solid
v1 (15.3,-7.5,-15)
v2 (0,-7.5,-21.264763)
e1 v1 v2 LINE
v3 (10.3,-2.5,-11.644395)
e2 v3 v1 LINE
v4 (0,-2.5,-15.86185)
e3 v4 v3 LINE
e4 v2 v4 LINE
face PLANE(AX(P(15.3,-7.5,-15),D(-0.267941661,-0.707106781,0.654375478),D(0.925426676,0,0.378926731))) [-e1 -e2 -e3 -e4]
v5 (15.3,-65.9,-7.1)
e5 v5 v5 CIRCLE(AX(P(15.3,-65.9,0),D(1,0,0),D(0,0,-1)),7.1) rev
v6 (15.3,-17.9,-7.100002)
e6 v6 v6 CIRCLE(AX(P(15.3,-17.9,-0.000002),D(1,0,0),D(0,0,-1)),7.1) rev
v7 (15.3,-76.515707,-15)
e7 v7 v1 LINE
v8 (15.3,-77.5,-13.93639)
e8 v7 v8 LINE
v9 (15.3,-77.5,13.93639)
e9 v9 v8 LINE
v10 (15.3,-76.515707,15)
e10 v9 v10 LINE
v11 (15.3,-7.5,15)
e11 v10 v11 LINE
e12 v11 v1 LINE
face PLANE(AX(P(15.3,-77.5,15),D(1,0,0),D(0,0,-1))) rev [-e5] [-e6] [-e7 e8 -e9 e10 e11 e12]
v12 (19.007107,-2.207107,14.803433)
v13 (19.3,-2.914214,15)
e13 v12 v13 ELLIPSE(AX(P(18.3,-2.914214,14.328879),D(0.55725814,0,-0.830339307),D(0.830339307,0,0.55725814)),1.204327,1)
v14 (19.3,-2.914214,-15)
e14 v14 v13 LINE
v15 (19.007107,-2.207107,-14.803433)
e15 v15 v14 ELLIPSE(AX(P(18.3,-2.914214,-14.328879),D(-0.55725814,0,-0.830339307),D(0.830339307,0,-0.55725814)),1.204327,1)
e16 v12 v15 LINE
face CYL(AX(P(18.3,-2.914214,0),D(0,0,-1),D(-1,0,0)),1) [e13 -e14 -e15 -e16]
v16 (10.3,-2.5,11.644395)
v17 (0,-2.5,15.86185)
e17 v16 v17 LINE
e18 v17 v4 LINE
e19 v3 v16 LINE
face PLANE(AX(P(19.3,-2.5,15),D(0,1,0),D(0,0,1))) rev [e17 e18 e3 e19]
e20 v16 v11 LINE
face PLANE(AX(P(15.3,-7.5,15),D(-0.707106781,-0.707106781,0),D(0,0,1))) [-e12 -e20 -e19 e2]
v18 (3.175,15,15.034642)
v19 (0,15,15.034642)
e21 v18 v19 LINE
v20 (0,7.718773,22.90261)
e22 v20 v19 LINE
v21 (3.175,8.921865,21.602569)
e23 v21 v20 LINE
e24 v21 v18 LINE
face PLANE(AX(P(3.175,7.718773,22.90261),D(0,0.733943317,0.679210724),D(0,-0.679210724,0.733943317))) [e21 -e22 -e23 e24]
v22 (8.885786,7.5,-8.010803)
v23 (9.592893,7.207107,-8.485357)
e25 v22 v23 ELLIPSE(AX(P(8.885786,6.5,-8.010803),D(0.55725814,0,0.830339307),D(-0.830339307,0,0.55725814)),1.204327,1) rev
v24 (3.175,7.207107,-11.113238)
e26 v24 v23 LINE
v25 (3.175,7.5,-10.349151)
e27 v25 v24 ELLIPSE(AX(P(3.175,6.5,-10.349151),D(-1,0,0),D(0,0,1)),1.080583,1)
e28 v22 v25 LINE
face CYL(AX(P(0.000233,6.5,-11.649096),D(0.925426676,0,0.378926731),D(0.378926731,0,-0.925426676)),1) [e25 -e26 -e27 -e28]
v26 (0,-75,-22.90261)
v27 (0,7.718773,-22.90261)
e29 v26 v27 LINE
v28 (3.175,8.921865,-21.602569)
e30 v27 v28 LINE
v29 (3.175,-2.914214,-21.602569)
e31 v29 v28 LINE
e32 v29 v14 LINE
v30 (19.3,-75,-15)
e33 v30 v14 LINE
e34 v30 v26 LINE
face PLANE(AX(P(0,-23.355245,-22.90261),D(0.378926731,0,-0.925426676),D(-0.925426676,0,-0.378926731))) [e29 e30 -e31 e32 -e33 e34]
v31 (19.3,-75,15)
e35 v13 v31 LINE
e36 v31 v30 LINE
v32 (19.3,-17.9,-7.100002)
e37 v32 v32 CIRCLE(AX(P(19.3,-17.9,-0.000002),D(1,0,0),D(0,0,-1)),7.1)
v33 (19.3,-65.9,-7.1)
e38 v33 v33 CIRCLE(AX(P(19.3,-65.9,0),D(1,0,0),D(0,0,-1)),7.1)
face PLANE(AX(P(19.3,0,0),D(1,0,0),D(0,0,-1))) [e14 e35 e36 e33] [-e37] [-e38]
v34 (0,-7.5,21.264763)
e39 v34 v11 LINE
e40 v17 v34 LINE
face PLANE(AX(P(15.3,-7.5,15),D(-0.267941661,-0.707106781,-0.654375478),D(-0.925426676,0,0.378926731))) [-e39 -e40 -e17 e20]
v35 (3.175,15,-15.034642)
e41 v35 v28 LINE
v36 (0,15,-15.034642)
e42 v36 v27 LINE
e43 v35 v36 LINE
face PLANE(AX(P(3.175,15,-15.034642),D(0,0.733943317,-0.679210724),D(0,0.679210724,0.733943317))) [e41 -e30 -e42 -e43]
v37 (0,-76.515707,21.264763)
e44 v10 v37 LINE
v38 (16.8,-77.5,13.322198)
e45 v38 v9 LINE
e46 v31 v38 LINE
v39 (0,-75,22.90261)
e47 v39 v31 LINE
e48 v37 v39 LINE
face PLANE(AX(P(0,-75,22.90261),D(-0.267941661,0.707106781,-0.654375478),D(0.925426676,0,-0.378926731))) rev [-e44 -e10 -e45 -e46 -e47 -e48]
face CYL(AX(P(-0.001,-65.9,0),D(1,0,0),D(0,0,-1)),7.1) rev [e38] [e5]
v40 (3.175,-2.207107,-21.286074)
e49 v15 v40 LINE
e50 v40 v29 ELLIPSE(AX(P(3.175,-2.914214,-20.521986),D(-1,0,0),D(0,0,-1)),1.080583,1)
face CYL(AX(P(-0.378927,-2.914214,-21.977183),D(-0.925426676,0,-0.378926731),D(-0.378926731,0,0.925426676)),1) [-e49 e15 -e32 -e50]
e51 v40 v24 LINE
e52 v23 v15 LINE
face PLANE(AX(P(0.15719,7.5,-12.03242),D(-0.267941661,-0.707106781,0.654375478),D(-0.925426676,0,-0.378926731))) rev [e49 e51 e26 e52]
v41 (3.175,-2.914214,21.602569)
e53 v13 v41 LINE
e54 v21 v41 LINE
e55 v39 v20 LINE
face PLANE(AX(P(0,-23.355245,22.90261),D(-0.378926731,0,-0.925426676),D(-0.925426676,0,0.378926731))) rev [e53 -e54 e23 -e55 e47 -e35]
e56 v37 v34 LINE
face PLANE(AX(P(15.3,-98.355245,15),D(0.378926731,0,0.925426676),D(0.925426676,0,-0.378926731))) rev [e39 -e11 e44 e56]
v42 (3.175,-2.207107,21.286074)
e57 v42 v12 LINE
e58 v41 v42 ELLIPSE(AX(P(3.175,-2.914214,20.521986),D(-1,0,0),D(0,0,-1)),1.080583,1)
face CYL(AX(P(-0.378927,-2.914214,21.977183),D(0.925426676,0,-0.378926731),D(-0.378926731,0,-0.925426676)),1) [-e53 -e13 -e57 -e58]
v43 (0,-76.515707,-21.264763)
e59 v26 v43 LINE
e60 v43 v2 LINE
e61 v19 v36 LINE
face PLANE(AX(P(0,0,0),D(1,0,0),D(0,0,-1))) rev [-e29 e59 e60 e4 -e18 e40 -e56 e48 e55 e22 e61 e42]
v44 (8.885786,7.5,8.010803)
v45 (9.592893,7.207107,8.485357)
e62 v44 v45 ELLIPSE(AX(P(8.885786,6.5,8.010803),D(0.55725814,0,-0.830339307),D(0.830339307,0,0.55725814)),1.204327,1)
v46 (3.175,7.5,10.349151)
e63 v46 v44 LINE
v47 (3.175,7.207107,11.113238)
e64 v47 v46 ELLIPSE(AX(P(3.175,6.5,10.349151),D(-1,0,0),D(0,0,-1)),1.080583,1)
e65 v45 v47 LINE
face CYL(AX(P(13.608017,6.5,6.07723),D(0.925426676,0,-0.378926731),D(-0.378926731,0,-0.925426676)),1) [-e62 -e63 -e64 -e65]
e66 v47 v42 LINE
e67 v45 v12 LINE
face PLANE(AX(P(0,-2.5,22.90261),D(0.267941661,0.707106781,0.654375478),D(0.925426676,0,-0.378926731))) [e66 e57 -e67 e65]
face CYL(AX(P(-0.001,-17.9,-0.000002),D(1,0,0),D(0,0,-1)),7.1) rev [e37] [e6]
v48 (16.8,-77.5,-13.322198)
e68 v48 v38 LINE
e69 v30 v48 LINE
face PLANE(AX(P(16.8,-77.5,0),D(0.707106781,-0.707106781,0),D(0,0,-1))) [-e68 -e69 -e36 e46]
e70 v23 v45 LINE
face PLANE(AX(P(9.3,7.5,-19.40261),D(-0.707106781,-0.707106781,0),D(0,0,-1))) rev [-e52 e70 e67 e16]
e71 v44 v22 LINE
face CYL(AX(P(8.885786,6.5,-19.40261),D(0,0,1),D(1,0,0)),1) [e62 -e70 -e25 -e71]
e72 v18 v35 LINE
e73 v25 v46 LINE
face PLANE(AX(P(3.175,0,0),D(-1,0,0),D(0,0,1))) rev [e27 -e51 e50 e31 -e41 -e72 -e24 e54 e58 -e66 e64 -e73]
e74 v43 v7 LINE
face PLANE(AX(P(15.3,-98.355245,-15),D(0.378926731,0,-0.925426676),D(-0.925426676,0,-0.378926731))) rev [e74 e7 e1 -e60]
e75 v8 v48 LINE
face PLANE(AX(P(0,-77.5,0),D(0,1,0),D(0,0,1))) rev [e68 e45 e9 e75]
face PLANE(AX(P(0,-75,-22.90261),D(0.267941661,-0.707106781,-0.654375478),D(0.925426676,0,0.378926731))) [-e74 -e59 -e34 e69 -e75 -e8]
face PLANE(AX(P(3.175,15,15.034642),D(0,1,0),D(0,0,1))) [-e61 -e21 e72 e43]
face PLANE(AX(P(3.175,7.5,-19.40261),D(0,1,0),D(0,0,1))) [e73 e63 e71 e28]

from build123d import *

# Parameters (mm, degrees)
SKETCH1_W            = 30
SKETCH1_H            = 5
BOSS_EXTRUDE1_DEPTH  = 19.3
SKETCH2_W            = 40
SKETCH2_H            = 10
BOSS_EXTRUDE2_DEPTH  = 3.175
SKETCH3_W            = 4
SKETCH3_H            = 30
BOSS_EXTRUDE3_DEPTH  = 75
CUT_EXTRUDE1_REACH   = 84.48
SKETCH4_R            = 7.1
BOSS_EXTRUDE7_DEPTH  = 5
BOSS_EXTRUDE8_DEPTH  = 5
CHAMFER1_SIZE        = 5
BOSS_EXTRUDE9_DEPTH  = 75
BOSS_EXTRUDE10_DEPTH = 5
CHAMFER2_SIZE        = 5
CHAMFER3_SIZE        = 10
BOSS_EXTRUDE15_DEPTH = 3.175
CUT_EXTRUDE2_DEPTH   = 81.759021382
FILLET6_R            = 1
FILLET7_R            = 1
CHAMFER6_SIZE        = 2.5


with BuildPart() as part:
    # Sketch1 → Boss-Extrude1 (new body)
    with BuildSketch(Plane(origin=(0, 0, 0), x_dir=(0, 0, -1), z_dir=(1, 0, 0))):
        Rectangle(SKETCH1_W, SKETCH1_H)
    extrude(amount=BOSS_EXTRUDE1_DEPTH)

    # Sketch2 → Boss-Extrude2 (add)
    with BuildSketch(Plane.ZY):
        with Locations((0.597390222, 2.5)):
            Rectangle(SKETCH2_W, SKETCH2_H)
    extrude(amount=-BOSS_EXTRUDE2_DEPTH)

    # Sketch3 → Boss-Extrude3 (add)
    with BuildSketch(Plane.XZ.offset(2.5)):
        with Locations((17.3, 0)):
            Rectangle(SKETCH3_W, SKETCH3_H)
    extrude(amount=BOSS_EXTRUDE3_DEPTH)

    # Sketch4 → Cut-Extrude1 (cut, up to next)
    with BuildSketch(Plane(origin=(19.3, 0, 0), x_dir=(0, 0, -1), z_dir=(1, 0, 0)), mode=Mode.PRIVATE) as cut_extrude1_sk1:
        with Locations((2.035e-06, -17.9)):
            Circle(SKETCH4_R)
    cut_extrude1_tool1 = extrude(cut_extrude1_sk1.sketch, amount=-CUT_EXTRUDE1_REACH, mode=Mode.PRIVATE) & part.part
    # Sketch4 → Cut-Extrude1 (cut, up to next)
    with BuildSketch(Plane(origin=(19.3, 0, 0), x_dir=(0, 0, -1), z_dir=(1, 0, 0)), mode=Mode.PRIVATE) as cut_extrude1_sk2:
        with Locations((-1.3e-07, -65.9)):
            Circle(SKETCH4_R)
    cut_extrude1_tool2 = extrude(cut_extrude1_sk2.sketch, amount=-CUT_EXTRUDE1_REACH, mode=Mode.PRIVATE) & part.part
    add(cut_extrude1_tool1.solids().sort_by_distance((19.3, -17.9, -2e-06))[0], mode=Mode.SUBTRACT)
    add(cut_extrude1_tool2.solids().sort_by_distance((19.3, -65.9, 0))[0], mode=Mode.SUBTRACT)

    # Sketch10 → Boss-Extrude7 (add)
    with BuildSketch(Plane(origin=(0, 2.5, 0), x_dir=(1, 0, 0), z_dir=(0, 1, 0))):
        Polygon((3.175, 19.402609778), (0, 19.402609778), (0, 22.902609778), (19.3, 15), (3.175, 15), align=None)
    boss_extrude7 = extrude(amount=-BOSS_EXTRUDE7_DEPTH)

    # Sketch11 → Boss-Extrude8 (add)
    with BuildSketch(Plane(origin=(0, 2.5, 0), x_dir=(1, 0, 0), z_dir=(0, 1, 0))):
        Polygon((0, 19.402609778), (0, 22.902609778), (3.175, 21.60256905), (3.175, 19.402609778), align=None)
    boss_extrude8 = extrude(amount=BOSS_EXTRUDE8_DEPTH)

    # Mirror2: Boss-Extrude7, Boss-Extrude8 across plane
    add(boss_extrude7.mirror(Plane(origin=(0, 0, 0), x_dir=(1, 0, 0), z_dir=(0, 0, -1))))
    add(boss_extrude8.mirror(Plane(origin=(0, 0, 0), x_dir=(1, 0, 0), z_dir=(0, 0, -1))))

    # Chamfer1
    chamfer1_edges = [part.edges().sort_by_distance(p)[0] for p in [
        (3.175, 2.5, 0),
    ]]
    chamfer(chamfer1_edges, length=CHAMFER1_SIZE - 0.0001)  # a hair under: the kernel refuses the full size

    # Sketch12 → Boss-Extrude9 (add)
    with BuildSketch(Plane.XZ.offset(2.5)):
        Polygon((0, -22.902609778), (19.3, -15), (15.3, -15), (0, -21.264763192), align=None)
        Polygon((0, 22.902609778), (19.3, 15), (15.3, 15), (0, 21.264763192), align=None)
    extrude(amount=BOSS_EXTRUDE9_DEPTH)

    # Sketch13 → Boss-Extrude10 (add)
    with BuildSketch(Plane(origin=(0, 2.5, 0), x_dir=(1, 0, 0), z_dir=(0, 1, 0))):
        Polygon((3.175, 21.60256905), (3.175, -21.60256905), (19.3, -15), (19.3, 15), align=None)
    extrude(amount=BOSS_EXTRUDE10_DEPTH)

    # Chamfer2
    chamfer2_edges = [part.edges().sort_by_distance(p)[0] for p in [
        (7.65, -2.5, -18.132381596),
        (7.65, -2.5, 18.132381596),
        (15.3, -2.5, 0),
    ]]
    chamfer(chamfer2_edges, length=CHAMFER2_SIZE)

    # Chamfer3
    chamfer3_edges = [part.edges().sort_by_distance(p)[0] for p in [
        (9.65, 7.5, 18.951304889),
        (19.3, 7.5, 0),
        (9.65, 7.5, -18.951304889),
    ]]
    chamfer(chamfer3_edges, length=CHAMFER3_SIZE)

    # Sketch14 → Boss-Extrude15 (add)
    with BuildSketch(Plane.ZY):
        Polygon((-22.902609778, -2.5), (-22.902609778, 7.718772797), (-15.034642071, 15), (15.034642071, 15), (22.902609778, 7.718772797), (22.902609778, -2.5), align=None)
    extrude(amount=-BOSS_EXTRUDE15_DEPTH)

    # Sketch15 → Cut-Extrude2 (cut, through all)
    with BuildSketch(Plane.XZ.offset(2.5)):
        Polygon((3.175, 22.902609778), (0, 22.902609778), (3.175, 21.60256905), align=None)
        Polygon((3.175, -22.902609778), (3.175, -21.60256905), (0, -22.902609778), align=None)
    extrude(amount=-CUT_EXTRUDE2_DEPTH, mode=Mode.SUBTRACT)

    # Fillet6
    fillet6_edges = [part.edges().sort_by_distance(p)[0] for p in [
        (9.3, 7.5, 0),
        (6.2375, 7.5, -9.542766367),
        (6.2375, 7.5, 9.542766367),
    ]]
    fillet(fillet6_edges, radius=FILLET6_R)

    # Fillet7
    fillet7_edges = [part.edges().sort_by_distance(p)[0] for p in [
        (11.2375, -2.5, 18.301284525),
        (19.3, -2.5, 0),
        (11.2375, -2.5, -18.301284525),
    ]]
    fillet(fillet7_edges, radius=FILLET7_R)

    # Chamfer6
    chamfer6_edges = [part.edges().sort_by_distance(p)[0] for p in [
        (9.65, -77.5, -18.951304889),
        (19.3, -77.5, 0),
        (9.65, -77.5, 18.951304889),
    ]]
    chamfer(chamfer6_edges, length=CHAMFER6_SIZE)


solid = part.part
